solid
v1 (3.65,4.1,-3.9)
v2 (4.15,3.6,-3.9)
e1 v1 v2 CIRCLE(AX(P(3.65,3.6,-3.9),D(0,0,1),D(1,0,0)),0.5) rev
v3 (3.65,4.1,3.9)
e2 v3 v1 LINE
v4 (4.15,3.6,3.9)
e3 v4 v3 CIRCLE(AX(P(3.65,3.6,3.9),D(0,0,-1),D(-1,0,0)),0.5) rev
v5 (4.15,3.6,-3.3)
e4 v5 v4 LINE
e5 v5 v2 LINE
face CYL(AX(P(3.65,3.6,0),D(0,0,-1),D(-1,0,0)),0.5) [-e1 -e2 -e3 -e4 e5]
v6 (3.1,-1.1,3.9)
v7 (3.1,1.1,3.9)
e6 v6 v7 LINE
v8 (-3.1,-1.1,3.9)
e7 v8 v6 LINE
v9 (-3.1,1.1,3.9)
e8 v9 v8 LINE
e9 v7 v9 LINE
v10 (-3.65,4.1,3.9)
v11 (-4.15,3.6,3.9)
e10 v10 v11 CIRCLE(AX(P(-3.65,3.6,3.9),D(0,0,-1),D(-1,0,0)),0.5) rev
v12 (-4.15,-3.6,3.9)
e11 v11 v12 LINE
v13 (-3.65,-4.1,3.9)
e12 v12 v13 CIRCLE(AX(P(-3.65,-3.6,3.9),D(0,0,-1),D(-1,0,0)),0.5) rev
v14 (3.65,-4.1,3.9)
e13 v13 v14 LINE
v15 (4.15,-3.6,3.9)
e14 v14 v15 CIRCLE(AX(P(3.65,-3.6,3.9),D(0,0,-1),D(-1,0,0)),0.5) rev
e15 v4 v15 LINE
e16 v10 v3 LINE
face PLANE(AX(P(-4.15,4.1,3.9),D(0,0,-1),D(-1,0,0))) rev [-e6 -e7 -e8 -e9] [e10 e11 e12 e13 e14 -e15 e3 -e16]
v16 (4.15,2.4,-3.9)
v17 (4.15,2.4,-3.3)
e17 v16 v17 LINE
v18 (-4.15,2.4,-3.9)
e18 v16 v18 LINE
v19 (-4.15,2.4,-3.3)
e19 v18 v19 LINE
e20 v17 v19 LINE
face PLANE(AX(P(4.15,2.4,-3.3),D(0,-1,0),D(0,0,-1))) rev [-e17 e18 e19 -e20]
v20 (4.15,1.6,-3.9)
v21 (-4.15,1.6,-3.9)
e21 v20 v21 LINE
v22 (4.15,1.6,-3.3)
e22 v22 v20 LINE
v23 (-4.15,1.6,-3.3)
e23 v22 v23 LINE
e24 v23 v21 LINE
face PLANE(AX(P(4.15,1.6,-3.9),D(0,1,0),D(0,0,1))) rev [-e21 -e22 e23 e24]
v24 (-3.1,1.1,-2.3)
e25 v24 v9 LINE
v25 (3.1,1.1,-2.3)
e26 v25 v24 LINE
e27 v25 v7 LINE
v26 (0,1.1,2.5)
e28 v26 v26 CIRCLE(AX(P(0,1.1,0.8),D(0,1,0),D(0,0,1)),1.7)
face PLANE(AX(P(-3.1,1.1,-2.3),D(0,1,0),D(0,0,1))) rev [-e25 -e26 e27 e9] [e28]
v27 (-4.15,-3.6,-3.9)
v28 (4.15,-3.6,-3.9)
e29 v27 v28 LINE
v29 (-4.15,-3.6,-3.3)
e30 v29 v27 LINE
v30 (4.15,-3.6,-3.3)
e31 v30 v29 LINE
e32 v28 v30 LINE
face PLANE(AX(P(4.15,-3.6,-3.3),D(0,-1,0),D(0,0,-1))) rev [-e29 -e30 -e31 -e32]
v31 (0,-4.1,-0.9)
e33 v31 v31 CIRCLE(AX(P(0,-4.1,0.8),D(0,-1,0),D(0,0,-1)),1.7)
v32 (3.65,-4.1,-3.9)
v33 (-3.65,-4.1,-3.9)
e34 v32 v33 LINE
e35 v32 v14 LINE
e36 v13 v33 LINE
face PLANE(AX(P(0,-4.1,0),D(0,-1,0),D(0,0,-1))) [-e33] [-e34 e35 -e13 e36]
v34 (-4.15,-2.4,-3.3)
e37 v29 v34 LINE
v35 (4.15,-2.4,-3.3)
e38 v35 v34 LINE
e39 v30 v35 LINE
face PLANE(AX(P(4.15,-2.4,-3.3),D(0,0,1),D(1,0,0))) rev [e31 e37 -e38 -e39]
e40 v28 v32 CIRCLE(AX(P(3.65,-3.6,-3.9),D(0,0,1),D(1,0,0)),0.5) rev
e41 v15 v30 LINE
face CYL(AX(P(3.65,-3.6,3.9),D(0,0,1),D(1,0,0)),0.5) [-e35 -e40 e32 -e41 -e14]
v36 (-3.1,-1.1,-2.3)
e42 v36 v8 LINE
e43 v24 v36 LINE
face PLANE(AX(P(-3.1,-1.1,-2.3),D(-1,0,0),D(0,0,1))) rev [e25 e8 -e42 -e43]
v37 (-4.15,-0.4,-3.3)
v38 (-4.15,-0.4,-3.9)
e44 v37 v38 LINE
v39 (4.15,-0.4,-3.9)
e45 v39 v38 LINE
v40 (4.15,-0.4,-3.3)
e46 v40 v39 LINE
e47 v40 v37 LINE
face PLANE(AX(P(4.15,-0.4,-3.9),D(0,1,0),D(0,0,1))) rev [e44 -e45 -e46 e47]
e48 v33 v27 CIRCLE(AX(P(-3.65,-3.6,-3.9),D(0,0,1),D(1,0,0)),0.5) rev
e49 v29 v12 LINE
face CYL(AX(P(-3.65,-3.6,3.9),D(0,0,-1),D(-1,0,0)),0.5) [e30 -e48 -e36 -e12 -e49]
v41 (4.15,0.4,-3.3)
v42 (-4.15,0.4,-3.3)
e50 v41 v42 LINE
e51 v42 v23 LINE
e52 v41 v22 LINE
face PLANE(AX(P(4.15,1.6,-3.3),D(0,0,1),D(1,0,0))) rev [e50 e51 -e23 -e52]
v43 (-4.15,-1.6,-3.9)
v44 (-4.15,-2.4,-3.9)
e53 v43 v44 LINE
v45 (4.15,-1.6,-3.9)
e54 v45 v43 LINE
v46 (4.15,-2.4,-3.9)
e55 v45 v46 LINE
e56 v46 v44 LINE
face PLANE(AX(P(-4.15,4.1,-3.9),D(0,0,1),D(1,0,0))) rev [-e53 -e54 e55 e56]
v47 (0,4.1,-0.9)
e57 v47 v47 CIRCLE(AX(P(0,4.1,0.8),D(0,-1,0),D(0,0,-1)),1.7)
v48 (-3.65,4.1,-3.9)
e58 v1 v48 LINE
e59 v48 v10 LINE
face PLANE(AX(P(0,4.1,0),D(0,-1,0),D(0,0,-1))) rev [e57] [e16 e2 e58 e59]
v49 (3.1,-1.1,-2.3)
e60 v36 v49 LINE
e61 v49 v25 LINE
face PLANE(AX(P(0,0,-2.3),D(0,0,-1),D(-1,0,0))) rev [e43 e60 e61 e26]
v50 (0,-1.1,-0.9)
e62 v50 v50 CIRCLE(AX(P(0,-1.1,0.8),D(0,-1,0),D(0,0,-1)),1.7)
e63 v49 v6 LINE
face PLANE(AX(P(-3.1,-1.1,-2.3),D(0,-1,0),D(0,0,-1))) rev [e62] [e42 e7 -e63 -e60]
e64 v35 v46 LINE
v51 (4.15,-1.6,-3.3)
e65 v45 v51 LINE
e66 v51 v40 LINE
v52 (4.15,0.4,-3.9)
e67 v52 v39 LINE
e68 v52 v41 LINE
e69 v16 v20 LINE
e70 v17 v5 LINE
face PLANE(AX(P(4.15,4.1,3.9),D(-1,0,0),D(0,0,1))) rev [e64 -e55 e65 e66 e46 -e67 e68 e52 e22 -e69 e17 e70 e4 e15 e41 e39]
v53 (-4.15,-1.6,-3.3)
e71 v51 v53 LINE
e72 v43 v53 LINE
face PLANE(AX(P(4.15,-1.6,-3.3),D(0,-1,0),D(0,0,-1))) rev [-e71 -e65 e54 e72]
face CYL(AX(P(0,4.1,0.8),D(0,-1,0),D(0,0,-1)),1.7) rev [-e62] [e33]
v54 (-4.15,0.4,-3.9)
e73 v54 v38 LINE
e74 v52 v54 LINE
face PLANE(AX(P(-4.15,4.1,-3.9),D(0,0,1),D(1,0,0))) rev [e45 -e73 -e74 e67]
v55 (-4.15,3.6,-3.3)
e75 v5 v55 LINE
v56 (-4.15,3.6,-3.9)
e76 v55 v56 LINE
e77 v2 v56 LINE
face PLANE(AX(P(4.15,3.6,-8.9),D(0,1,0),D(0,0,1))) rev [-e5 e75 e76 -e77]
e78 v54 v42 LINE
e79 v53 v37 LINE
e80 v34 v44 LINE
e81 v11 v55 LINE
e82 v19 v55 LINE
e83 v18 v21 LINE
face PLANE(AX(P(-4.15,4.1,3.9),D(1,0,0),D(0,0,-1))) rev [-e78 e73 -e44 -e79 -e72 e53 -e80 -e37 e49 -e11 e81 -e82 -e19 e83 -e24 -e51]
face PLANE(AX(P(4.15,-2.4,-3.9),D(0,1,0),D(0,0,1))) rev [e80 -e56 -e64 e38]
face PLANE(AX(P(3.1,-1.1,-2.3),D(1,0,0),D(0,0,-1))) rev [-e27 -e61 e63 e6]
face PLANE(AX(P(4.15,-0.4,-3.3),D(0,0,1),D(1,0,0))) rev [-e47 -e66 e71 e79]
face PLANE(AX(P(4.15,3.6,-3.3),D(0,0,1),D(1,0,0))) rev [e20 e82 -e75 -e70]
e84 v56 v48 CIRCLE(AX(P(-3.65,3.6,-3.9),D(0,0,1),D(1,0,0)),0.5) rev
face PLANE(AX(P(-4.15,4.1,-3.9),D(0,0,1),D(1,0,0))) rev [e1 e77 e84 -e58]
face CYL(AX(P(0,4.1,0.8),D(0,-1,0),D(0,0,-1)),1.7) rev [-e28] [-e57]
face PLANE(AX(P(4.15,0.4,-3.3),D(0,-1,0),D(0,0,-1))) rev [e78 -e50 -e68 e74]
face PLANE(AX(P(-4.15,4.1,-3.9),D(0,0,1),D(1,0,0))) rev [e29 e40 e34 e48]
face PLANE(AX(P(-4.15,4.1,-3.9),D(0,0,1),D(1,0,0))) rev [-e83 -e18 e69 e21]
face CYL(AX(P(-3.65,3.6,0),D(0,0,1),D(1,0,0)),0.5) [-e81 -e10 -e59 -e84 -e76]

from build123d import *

# Parameters (mm, degrees)
SKETCH1_W           = 8.3
SKETCH1_H           = 7.8
BOSS_EXTRUDE1_DEPTH = 4.1
CUT_EXTRUDE1_DEPTH  = 11.045396956
SKETCH4_W           = 6.2
SKETCH4_H           = 2.2
CUT_EXTRUDE2_DEPTH  = 6.2
SKETCH5_R           = 1.7
CUT_EXTRUDE3_DEPTH  = 10.983611571
FILLET1_R           = 0.5


with BuildPart() as part:
    # Sketch1 → Boss-Extrude1 (new, symmetric)
    with BuildSketch(Plane(origin=(0, 0, 0), x_dir=(1, 0, 0), z_dir=(0, 1, 0))):
        Rectangle(SKETCH1_W, SKETCH1_H)
    extrude(amount=BOSS_EXTRUDE1_DEPTH, both=True)

    # Sketch2 → Cut-Extrude1 (cut, through all)
    with BuildSketch(Plane.ZY.offset(4.15)):
        Polygon((-8.9, 3.6), (-3.3, 3.6), (-3.3, 2.4), (-3.9, 2.4), (-3.9, 1.6), (-3.3, 1.6), (-3.3, 0.4), (-3.9, 0.4), (-3.9, -0.4), (-3.3, -0.4), (-3.3, -1.6), (-3.9, -1.6), (-3.9, -2.4), (-3.3, -2.4), (-3.3, -3.6), (-8.9, -3.6), align=None)
    extrude(amount=-CUT_EXTRUDE1_DEPTH, mode=Mode.SUBTRACT)

    # Sketch4 → Cut-Extrude2 (cut)
    with BuildSketch(Plane.XY.offset(3.9)):
        Rectangle(SKETCH4_W, SKETCH4_H)
    extrude(amount=-CUT_EXTRUDE2_DEPTH, mode=Mode.SUBTRACT)

    # Sketch5 → Cut-Extrude3 (cut, through all)
    with BuildSketch(Plane.XZ.offset(4.1)):
        with Locations(Location((0, 0.8, 0), (0, 0, 270))):
            Circle(SKETCH5_R)
    extrude(amount=-CUT_EXTRUDE3_DEPTH, mode=Mode.SUBTRACT)

    # Fillet1
    fillet1_edges = [part.edges().sort_by_distance(p)[0] for p in [
        (4.15, 4.1, 0),
        (4.15, -4.1, 0),
        (-4.15, 4.1, 0),
        (-4.15, -4.1, 0),
    ]]
    fillet(fillet1_edges, radius=FILLET1_R - 0.0001)  # a hair under: the kernel refuses the full size


solid = part.part
